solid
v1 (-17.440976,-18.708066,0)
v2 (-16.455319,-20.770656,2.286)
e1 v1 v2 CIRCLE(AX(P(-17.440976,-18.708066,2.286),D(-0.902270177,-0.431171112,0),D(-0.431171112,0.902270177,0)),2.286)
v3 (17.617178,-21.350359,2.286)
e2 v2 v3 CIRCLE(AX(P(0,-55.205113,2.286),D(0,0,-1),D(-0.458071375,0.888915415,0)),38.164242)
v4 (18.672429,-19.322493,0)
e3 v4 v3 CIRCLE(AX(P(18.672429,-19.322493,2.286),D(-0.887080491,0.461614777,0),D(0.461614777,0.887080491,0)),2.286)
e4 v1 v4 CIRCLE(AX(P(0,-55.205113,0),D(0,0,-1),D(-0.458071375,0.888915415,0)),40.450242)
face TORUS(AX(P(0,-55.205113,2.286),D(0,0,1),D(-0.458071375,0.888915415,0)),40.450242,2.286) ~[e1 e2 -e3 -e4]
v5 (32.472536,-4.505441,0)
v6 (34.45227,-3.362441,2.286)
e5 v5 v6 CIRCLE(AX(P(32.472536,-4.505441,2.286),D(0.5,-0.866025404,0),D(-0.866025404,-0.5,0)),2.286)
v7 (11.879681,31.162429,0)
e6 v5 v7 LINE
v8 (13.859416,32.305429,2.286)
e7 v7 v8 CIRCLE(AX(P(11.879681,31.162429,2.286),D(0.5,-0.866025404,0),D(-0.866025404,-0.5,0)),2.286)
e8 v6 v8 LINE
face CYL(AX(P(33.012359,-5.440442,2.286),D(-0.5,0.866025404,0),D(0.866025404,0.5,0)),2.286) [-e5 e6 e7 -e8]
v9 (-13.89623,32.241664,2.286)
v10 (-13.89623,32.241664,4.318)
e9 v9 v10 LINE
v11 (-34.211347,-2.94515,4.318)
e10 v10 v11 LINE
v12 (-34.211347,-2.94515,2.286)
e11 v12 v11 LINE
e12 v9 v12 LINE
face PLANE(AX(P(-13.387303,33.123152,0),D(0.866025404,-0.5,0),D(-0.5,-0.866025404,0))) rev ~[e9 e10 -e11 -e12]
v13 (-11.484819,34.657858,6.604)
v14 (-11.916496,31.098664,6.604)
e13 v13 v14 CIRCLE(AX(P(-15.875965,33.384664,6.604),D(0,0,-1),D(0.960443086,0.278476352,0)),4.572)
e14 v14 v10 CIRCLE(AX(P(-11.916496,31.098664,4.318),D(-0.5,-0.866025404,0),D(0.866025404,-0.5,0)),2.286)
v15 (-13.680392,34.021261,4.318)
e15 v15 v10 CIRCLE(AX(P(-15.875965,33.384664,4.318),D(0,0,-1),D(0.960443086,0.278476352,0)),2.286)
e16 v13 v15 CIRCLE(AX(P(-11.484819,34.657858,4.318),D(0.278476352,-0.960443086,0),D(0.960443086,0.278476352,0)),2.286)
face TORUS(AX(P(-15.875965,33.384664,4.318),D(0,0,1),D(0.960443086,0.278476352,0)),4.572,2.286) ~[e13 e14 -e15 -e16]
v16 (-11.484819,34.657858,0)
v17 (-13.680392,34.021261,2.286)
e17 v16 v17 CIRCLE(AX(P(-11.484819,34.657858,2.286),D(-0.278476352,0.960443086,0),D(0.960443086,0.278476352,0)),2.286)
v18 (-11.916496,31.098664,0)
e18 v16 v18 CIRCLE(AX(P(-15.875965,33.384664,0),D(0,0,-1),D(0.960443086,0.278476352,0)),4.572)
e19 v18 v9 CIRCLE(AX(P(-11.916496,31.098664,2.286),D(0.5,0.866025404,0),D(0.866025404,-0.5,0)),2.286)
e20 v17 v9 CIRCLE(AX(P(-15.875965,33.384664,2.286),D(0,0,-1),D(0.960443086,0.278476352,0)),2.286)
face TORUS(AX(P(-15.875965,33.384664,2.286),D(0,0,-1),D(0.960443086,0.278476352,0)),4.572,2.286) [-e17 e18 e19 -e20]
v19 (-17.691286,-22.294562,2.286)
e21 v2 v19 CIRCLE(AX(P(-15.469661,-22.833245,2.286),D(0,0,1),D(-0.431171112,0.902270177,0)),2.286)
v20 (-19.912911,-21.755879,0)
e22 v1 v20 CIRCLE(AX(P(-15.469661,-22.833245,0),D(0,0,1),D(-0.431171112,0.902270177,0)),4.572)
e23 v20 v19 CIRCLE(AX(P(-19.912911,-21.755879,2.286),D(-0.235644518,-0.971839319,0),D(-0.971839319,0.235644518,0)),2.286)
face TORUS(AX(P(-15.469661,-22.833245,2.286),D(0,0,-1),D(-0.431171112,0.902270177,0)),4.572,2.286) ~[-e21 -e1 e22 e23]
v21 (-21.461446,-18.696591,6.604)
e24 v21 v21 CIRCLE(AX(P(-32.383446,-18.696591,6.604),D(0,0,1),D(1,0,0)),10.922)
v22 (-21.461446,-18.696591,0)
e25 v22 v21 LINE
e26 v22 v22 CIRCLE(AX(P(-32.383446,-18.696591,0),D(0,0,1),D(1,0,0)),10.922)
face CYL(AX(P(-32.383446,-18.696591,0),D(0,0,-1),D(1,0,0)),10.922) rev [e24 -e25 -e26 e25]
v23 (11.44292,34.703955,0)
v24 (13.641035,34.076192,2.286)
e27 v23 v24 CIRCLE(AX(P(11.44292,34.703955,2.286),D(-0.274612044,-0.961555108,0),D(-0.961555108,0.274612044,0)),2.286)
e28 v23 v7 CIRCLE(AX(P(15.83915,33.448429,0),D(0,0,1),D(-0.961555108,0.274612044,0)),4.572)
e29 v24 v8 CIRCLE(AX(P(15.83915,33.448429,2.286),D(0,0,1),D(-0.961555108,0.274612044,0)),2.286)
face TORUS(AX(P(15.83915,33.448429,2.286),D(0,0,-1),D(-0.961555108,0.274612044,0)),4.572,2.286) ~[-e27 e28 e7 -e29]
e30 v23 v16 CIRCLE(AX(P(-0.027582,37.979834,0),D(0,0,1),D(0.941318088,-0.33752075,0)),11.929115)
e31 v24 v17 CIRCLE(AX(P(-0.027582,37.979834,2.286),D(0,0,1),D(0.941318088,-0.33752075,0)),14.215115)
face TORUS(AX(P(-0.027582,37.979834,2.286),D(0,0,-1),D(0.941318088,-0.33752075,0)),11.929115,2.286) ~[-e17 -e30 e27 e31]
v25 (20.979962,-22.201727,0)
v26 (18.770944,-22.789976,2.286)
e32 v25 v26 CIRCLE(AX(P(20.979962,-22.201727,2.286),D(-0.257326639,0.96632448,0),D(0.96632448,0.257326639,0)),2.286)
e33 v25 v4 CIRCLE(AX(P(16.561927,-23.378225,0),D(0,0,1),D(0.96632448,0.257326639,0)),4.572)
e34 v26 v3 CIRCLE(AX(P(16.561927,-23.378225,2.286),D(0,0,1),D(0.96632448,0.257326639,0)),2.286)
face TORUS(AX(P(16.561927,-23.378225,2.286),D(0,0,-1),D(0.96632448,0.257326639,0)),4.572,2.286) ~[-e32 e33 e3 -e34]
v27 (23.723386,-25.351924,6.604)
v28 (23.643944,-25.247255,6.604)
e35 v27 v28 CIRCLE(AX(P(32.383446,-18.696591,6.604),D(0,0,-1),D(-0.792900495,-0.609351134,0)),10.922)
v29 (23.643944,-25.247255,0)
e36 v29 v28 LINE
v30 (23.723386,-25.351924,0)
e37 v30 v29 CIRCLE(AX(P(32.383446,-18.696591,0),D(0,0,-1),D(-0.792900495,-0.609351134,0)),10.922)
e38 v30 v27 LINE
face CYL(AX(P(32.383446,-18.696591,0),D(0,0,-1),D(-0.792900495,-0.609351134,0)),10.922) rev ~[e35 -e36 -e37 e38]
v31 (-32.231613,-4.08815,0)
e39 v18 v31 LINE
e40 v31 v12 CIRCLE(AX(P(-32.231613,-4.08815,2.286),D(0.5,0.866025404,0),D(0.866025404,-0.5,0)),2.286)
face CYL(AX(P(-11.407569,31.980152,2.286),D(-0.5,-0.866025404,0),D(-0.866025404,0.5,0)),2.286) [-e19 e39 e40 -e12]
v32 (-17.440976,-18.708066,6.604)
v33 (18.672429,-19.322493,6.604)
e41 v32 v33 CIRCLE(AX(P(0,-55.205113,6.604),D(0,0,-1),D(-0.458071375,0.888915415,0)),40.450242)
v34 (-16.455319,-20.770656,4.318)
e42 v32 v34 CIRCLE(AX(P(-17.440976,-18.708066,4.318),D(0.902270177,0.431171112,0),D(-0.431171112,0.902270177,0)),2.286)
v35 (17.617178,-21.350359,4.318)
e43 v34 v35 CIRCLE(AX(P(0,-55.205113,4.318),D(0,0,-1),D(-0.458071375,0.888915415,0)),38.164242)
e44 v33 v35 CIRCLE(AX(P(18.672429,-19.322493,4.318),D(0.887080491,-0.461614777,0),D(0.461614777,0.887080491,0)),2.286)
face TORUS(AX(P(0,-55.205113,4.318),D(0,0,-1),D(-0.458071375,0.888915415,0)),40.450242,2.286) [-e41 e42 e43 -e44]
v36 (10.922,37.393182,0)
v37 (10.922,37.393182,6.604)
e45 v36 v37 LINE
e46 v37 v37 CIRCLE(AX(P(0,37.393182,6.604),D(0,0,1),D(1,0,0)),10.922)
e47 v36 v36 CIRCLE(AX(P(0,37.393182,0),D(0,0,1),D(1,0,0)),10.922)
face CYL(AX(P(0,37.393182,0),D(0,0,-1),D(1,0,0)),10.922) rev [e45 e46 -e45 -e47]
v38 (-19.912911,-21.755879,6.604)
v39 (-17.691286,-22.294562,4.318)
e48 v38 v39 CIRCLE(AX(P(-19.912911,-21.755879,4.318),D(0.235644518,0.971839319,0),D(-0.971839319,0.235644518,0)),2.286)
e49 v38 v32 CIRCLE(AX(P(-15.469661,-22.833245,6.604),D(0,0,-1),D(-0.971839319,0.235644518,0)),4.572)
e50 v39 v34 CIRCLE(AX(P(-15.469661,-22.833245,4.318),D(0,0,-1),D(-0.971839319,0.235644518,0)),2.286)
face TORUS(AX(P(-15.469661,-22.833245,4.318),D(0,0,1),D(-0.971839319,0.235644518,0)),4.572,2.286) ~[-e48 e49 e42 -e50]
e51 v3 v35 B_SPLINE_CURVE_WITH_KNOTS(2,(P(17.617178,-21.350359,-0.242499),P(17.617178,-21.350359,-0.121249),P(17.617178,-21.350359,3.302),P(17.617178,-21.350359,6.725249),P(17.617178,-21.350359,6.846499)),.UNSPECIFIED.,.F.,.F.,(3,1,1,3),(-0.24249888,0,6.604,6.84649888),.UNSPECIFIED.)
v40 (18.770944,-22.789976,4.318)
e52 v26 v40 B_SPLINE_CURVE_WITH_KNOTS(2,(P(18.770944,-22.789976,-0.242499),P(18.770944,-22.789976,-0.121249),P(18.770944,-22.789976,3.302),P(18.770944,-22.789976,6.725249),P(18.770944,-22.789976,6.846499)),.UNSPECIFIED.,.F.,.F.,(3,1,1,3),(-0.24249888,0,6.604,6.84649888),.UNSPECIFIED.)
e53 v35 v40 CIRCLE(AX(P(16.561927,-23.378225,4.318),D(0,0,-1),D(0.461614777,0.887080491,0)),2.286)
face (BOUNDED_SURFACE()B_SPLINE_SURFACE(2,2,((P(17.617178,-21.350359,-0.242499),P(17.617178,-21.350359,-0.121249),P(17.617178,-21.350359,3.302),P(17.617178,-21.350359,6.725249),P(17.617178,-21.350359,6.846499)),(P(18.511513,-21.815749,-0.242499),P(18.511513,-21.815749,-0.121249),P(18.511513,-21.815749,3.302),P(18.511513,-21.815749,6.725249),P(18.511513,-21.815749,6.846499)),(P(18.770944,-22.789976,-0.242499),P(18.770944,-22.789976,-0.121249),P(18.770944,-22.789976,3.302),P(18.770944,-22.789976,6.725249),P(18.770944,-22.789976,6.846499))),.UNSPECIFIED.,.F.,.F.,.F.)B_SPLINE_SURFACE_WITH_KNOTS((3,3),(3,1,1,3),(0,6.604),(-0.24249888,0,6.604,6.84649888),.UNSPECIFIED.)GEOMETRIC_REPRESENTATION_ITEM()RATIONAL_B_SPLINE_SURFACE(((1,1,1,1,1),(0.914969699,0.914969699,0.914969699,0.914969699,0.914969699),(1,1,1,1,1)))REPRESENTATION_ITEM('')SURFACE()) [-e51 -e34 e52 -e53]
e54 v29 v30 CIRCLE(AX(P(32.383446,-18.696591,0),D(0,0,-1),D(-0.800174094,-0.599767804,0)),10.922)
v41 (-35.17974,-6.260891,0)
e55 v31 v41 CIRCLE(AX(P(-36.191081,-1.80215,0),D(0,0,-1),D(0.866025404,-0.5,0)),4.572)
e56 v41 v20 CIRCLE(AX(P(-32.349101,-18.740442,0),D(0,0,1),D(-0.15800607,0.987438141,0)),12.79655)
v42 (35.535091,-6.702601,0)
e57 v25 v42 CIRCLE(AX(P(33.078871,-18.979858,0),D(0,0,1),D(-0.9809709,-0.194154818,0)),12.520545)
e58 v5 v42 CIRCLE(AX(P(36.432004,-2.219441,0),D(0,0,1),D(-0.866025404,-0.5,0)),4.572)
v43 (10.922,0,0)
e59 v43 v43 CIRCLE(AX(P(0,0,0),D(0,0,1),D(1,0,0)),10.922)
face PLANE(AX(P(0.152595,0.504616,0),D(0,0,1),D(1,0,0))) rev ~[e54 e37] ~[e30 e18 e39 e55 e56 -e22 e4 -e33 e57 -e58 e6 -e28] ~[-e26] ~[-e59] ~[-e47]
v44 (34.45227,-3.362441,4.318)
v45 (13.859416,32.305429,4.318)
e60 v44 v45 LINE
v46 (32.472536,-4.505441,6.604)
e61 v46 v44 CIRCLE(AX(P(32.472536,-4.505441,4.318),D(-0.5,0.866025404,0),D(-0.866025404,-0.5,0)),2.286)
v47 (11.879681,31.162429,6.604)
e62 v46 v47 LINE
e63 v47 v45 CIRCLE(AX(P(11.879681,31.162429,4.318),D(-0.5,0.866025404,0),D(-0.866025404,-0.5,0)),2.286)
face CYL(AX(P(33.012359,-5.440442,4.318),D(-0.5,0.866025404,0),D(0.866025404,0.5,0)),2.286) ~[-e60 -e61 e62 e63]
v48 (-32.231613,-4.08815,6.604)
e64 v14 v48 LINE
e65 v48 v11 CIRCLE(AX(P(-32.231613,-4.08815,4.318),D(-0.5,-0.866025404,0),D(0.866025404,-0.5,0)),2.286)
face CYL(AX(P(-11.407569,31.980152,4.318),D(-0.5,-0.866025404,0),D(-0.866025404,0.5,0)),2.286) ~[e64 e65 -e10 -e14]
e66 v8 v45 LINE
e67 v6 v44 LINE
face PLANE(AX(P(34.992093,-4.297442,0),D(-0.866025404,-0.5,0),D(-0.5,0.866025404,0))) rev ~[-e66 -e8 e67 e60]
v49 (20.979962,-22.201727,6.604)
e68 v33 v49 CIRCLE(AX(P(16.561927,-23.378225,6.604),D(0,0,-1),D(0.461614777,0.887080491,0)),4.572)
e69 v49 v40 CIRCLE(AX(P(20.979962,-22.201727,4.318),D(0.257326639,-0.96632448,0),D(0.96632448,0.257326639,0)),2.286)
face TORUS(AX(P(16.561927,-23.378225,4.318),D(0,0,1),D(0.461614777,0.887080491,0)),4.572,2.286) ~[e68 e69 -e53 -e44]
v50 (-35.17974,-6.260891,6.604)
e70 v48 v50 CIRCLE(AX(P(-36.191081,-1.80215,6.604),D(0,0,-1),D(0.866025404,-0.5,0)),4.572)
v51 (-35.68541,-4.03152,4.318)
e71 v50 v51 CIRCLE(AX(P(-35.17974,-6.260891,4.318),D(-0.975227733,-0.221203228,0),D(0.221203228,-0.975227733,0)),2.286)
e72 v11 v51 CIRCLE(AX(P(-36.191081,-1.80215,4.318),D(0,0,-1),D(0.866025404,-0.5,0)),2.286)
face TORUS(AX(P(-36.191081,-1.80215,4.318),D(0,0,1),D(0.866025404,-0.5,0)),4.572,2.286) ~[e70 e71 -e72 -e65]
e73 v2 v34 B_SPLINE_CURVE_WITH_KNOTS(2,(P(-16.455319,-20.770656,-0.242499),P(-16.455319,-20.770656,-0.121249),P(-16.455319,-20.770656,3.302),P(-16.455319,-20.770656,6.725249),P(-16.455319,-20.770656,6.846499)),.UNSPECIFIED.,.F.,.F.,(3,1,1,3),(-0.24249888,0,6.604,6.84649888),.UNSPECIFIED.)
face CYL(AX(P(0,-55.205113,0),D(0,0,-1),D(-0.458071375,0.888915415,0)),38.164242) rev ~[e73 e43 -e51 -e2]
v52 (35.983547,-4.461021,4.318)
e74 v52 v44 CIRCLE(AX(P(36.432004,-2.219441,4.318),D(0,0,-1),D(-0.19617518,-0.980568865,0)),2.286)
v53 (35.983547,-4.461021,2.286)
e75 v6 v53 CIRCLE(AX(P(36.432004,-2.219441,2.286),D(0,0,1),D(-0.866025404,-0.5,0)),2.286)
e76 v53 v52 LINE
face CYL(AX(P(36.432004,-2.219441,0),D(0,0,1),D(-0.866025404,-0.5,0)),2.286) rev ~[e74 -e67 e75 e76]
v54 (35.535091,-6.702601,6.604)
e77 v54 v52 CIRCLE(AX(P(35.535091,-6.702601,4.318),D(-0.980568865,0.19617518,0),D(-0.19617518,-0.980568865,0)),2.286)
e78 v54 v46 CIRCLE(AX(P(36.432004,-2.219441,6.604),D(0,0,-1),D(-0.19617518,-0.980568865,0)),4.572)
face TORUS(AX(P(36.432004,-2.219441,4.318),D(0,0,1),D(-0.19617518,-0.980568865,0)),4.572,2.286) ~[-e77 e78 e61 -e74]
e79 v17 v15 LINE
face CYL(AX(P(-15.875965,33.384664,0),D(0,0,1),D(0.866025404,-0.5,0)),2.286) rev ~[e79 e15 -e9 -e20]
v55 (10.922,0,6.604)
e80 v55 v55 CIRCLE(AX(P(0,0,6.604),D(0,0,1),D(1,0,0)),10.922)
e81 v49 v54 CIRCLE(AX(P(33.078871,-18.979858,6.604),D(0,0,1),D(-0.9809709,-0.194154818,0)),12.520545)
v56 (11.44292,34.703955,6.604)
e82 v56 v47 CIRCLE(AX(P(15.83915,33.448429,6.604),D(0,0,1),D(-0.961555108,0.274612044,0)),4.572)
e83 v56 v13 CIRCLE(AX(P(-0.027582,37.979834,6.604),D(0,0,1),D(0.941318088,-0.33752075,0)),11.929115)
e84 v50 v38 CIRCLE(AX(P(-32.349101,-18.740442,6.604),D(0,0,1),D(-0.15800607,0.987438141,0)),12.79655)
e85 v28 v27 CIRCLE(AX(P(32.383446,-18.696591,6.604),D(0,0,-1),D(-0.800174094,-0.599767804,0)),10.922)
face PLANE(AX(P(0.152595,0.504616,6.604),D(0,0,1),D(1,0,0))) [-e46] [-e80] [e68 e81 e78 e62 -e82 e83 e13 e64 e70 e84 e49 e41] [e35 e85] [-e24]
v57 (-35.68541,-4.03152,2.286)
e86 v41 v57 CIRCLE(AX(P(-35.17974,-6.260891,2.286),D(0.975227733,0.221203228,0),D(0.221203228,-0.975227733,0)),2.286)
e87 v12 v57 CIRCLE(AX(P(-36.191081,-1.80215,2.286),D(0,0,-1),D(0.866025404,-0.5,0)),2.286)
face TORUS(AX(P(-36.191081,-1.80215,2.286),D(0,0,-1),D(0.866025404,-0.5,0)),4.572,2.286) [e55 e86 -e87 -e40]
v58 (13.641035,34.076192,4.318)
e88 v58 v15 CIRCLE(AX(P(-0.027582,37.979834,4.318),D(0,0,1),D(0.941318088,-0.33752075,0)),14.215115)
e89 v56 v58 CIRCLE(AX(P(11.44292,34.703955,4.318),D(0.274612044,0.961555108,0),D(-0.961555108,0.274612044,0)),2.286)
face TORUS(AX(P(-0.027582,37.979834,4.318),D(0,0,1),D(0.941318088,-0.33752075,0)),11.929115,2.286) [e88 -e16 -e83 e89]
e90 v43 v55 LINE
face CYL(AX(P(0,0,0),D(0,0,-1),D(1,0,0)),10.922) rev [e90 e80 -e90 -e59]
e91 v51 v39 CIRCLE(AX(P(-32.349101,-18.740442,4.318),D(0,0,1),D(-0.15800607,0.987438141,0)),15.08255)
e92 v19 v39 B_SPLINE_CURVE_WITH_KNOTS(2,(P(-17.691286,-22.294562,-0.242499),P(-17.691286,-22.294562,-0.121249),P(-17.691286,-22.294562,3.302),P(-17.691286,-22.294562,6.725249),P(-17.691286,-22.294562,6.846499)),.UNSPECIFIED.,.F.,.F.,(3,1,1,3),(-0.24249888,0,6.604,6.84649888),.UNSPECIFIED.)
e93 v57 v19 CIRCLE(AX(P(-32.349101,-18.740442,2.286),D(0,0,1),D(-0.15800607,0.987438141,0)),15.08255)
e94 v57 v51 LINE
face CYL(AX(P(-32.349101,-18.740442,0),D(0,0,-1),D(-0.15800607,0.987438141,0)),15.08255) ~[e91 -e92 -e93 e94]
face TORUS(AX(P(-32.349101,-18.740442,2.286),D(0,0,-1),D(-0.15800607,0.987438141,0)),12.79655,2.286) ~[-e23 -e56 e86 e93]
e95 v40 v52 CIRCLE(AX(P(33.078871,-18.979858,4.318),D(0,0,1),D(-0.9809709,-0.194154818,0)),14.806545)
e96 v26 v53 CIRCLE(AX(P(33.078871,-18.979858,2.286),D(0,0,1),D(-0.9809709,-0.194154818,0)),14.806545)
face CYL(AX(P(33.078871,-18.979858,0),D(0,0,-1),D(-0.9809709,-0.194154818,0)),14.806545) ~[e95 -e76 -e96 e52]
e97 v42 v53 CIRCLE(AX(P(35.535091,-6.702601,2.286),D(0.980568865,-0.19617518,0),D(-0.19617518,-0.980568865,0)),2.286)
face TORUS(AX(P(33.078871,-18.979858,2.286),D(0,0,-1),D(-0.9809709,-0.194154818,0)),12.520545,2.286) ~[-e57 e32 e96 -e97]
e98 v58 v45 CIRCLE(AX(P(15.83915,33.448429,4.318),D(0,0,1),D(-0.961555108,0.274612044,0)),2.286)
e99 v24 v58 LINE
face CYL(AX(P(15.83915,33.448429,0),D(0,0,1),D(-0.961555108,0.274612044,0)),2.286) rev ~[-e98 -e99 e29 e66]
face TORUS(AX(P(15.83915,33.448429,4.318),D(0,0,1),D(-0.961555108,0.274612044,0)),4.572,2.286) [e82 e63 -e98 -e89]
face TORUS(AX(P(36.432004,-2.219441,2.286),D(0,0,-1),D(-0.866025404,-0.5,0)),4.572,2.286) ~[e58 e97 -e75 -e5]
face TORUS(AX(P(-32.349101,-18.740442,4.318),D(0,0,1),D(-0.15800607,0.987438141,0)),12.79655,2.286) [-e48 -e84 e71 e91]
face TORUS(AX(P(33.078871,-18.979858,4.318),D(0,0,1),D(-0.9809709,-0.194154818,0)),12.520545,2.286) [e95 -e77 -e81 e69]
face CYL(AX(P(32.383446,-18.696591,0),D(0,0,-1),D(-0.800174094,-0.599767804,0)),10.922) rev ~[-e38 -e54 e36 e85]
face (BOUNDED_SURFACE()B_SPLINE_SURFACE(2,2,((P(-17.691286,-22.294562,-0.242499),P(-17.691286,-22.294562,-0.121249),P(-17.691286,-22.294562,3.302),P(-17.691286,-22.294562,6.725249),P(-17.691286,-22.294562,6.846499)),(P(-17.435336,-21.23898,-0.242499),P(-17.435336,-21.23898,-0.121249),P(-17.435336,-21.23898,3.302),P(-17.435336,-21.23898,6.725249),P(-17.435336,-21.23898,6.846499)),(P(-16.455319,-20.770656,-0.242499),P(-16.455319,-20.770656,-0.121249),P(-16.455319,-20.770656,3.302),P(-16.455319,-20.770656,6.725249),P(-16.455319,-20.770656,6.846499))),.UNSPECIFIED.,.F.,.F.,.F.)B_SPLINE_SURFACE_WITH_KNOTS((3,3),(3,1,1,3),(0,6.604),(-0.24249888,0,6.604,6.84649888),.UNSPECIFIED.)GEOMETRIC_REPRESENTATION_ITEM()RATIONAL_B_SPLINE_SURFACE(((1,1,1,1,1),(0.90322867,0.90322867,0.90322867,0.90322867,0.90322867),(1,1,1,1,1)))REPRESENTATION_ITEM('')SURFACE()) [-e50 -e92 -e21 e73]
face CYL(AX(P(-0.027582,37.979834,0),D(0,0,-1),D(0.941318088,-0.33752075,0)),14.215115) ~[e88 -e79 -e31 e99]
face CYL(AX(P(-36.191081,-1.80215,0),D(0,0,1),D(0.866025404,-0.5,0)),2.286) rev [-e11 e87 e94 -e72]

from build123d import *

# Parameters (mm, degrees)
F0_R     = 10.922
F1_DEPTH = 6.604
F2_R     = 2.286


with BuildPart() as f1:
    # F0 (on Top) → F1 (new body)
    with BuildSketch(Plane.XY):
        with BuildLine():
            Line((-13.3873032043, 33.1231516497), (-34.7322359773, -3.8473563972))
            ThreePointArc((-34.7322359773, -3.8473563972), (-43.0701011693, -29.3490933873), (-17.4819467583, -21.2803302039))
            ThreePointArc((-17.4819467583, -21.2803302039), (0.6081285176, -17.0457166579), (18.5540814858, -21.8546195923))
            ThreePointArc((18.5540814858, -21.8546195923), (43.8875031627, -29.0995032663), (34.9920927448, -4.2974415213))
            Line((34.9920927448, -4.2974415213), (13.3533630424, 33.1819377345))
            ThreePointArc((13.3533630424, 33.1819377345), (-0.0588324041, 52.1949153144), (-13.3873032043, 33.1231516497))
        make_face()
        with Locations((-32.3834455885, -18.6965910278)):
            Circle(F0_R, mode=Mode.SUBTRACT)
        Circle(F0_R, mode=Mode.SUBTRACT)
        with BuildLine():
            ThreePointArc((23.643944132, -25.247254986), (28.9311094886, -8.3345709808), (43.3054455885, -18.6965910278))
            ThreePointArc((43.3054455885, -18.6965910278), (35.8980520612, -29.0376560282), (23.7233863792, -25.3519241143))
            ThreePointArc((23.7233863792, -25.3519241143), (23.6835078446, -25.2997090226), (23.643944132, -25.247254986))
        make_face(mode=Mode.SUBTRACT)
        with Locations((0, 37.3931820556)):
            Circle(F0_R, mode=Mode.SUBTRACT)
    extrude(amount=F1_DEPTH)

    # F2
    f2_edges = [f1.edges().sort_by_distance(p)[0] for p in [
        (-17.481947, -21.28033, 3.302),
        (18.554081, -21.85462, 3.302),
        (34.992093, -4.297442, 3.302),
        (-13.387303, 33.123152, 3.302),
        (-34.732236, -3.847356, 3.302),
        (13.353363, 33.181938, 3.302),
        (-0.058832, 52.194915, 0),
        (-0.058832, 52.194915, 6.604),
        (-24.05977, 14.637898, 0),
        (-24.05977, 14.637898, 6.604),
        (-43.070101, -29.349093, 6.604),
        (0.608129, -17.045717, 6.604),
        (43.887503, -29.099503, 6.604),
        (24.172728, 14.442248, 6.604),
        (24.172728, 14.442248, 0),
        (43.887503, -29.099503, 0),
        (0.608129, -17.045717, 0),
        (-43.070101, -29.349093, 0),
    ]]
    fillet(f2_edges, radius=F2_R)


solid = f1.part
